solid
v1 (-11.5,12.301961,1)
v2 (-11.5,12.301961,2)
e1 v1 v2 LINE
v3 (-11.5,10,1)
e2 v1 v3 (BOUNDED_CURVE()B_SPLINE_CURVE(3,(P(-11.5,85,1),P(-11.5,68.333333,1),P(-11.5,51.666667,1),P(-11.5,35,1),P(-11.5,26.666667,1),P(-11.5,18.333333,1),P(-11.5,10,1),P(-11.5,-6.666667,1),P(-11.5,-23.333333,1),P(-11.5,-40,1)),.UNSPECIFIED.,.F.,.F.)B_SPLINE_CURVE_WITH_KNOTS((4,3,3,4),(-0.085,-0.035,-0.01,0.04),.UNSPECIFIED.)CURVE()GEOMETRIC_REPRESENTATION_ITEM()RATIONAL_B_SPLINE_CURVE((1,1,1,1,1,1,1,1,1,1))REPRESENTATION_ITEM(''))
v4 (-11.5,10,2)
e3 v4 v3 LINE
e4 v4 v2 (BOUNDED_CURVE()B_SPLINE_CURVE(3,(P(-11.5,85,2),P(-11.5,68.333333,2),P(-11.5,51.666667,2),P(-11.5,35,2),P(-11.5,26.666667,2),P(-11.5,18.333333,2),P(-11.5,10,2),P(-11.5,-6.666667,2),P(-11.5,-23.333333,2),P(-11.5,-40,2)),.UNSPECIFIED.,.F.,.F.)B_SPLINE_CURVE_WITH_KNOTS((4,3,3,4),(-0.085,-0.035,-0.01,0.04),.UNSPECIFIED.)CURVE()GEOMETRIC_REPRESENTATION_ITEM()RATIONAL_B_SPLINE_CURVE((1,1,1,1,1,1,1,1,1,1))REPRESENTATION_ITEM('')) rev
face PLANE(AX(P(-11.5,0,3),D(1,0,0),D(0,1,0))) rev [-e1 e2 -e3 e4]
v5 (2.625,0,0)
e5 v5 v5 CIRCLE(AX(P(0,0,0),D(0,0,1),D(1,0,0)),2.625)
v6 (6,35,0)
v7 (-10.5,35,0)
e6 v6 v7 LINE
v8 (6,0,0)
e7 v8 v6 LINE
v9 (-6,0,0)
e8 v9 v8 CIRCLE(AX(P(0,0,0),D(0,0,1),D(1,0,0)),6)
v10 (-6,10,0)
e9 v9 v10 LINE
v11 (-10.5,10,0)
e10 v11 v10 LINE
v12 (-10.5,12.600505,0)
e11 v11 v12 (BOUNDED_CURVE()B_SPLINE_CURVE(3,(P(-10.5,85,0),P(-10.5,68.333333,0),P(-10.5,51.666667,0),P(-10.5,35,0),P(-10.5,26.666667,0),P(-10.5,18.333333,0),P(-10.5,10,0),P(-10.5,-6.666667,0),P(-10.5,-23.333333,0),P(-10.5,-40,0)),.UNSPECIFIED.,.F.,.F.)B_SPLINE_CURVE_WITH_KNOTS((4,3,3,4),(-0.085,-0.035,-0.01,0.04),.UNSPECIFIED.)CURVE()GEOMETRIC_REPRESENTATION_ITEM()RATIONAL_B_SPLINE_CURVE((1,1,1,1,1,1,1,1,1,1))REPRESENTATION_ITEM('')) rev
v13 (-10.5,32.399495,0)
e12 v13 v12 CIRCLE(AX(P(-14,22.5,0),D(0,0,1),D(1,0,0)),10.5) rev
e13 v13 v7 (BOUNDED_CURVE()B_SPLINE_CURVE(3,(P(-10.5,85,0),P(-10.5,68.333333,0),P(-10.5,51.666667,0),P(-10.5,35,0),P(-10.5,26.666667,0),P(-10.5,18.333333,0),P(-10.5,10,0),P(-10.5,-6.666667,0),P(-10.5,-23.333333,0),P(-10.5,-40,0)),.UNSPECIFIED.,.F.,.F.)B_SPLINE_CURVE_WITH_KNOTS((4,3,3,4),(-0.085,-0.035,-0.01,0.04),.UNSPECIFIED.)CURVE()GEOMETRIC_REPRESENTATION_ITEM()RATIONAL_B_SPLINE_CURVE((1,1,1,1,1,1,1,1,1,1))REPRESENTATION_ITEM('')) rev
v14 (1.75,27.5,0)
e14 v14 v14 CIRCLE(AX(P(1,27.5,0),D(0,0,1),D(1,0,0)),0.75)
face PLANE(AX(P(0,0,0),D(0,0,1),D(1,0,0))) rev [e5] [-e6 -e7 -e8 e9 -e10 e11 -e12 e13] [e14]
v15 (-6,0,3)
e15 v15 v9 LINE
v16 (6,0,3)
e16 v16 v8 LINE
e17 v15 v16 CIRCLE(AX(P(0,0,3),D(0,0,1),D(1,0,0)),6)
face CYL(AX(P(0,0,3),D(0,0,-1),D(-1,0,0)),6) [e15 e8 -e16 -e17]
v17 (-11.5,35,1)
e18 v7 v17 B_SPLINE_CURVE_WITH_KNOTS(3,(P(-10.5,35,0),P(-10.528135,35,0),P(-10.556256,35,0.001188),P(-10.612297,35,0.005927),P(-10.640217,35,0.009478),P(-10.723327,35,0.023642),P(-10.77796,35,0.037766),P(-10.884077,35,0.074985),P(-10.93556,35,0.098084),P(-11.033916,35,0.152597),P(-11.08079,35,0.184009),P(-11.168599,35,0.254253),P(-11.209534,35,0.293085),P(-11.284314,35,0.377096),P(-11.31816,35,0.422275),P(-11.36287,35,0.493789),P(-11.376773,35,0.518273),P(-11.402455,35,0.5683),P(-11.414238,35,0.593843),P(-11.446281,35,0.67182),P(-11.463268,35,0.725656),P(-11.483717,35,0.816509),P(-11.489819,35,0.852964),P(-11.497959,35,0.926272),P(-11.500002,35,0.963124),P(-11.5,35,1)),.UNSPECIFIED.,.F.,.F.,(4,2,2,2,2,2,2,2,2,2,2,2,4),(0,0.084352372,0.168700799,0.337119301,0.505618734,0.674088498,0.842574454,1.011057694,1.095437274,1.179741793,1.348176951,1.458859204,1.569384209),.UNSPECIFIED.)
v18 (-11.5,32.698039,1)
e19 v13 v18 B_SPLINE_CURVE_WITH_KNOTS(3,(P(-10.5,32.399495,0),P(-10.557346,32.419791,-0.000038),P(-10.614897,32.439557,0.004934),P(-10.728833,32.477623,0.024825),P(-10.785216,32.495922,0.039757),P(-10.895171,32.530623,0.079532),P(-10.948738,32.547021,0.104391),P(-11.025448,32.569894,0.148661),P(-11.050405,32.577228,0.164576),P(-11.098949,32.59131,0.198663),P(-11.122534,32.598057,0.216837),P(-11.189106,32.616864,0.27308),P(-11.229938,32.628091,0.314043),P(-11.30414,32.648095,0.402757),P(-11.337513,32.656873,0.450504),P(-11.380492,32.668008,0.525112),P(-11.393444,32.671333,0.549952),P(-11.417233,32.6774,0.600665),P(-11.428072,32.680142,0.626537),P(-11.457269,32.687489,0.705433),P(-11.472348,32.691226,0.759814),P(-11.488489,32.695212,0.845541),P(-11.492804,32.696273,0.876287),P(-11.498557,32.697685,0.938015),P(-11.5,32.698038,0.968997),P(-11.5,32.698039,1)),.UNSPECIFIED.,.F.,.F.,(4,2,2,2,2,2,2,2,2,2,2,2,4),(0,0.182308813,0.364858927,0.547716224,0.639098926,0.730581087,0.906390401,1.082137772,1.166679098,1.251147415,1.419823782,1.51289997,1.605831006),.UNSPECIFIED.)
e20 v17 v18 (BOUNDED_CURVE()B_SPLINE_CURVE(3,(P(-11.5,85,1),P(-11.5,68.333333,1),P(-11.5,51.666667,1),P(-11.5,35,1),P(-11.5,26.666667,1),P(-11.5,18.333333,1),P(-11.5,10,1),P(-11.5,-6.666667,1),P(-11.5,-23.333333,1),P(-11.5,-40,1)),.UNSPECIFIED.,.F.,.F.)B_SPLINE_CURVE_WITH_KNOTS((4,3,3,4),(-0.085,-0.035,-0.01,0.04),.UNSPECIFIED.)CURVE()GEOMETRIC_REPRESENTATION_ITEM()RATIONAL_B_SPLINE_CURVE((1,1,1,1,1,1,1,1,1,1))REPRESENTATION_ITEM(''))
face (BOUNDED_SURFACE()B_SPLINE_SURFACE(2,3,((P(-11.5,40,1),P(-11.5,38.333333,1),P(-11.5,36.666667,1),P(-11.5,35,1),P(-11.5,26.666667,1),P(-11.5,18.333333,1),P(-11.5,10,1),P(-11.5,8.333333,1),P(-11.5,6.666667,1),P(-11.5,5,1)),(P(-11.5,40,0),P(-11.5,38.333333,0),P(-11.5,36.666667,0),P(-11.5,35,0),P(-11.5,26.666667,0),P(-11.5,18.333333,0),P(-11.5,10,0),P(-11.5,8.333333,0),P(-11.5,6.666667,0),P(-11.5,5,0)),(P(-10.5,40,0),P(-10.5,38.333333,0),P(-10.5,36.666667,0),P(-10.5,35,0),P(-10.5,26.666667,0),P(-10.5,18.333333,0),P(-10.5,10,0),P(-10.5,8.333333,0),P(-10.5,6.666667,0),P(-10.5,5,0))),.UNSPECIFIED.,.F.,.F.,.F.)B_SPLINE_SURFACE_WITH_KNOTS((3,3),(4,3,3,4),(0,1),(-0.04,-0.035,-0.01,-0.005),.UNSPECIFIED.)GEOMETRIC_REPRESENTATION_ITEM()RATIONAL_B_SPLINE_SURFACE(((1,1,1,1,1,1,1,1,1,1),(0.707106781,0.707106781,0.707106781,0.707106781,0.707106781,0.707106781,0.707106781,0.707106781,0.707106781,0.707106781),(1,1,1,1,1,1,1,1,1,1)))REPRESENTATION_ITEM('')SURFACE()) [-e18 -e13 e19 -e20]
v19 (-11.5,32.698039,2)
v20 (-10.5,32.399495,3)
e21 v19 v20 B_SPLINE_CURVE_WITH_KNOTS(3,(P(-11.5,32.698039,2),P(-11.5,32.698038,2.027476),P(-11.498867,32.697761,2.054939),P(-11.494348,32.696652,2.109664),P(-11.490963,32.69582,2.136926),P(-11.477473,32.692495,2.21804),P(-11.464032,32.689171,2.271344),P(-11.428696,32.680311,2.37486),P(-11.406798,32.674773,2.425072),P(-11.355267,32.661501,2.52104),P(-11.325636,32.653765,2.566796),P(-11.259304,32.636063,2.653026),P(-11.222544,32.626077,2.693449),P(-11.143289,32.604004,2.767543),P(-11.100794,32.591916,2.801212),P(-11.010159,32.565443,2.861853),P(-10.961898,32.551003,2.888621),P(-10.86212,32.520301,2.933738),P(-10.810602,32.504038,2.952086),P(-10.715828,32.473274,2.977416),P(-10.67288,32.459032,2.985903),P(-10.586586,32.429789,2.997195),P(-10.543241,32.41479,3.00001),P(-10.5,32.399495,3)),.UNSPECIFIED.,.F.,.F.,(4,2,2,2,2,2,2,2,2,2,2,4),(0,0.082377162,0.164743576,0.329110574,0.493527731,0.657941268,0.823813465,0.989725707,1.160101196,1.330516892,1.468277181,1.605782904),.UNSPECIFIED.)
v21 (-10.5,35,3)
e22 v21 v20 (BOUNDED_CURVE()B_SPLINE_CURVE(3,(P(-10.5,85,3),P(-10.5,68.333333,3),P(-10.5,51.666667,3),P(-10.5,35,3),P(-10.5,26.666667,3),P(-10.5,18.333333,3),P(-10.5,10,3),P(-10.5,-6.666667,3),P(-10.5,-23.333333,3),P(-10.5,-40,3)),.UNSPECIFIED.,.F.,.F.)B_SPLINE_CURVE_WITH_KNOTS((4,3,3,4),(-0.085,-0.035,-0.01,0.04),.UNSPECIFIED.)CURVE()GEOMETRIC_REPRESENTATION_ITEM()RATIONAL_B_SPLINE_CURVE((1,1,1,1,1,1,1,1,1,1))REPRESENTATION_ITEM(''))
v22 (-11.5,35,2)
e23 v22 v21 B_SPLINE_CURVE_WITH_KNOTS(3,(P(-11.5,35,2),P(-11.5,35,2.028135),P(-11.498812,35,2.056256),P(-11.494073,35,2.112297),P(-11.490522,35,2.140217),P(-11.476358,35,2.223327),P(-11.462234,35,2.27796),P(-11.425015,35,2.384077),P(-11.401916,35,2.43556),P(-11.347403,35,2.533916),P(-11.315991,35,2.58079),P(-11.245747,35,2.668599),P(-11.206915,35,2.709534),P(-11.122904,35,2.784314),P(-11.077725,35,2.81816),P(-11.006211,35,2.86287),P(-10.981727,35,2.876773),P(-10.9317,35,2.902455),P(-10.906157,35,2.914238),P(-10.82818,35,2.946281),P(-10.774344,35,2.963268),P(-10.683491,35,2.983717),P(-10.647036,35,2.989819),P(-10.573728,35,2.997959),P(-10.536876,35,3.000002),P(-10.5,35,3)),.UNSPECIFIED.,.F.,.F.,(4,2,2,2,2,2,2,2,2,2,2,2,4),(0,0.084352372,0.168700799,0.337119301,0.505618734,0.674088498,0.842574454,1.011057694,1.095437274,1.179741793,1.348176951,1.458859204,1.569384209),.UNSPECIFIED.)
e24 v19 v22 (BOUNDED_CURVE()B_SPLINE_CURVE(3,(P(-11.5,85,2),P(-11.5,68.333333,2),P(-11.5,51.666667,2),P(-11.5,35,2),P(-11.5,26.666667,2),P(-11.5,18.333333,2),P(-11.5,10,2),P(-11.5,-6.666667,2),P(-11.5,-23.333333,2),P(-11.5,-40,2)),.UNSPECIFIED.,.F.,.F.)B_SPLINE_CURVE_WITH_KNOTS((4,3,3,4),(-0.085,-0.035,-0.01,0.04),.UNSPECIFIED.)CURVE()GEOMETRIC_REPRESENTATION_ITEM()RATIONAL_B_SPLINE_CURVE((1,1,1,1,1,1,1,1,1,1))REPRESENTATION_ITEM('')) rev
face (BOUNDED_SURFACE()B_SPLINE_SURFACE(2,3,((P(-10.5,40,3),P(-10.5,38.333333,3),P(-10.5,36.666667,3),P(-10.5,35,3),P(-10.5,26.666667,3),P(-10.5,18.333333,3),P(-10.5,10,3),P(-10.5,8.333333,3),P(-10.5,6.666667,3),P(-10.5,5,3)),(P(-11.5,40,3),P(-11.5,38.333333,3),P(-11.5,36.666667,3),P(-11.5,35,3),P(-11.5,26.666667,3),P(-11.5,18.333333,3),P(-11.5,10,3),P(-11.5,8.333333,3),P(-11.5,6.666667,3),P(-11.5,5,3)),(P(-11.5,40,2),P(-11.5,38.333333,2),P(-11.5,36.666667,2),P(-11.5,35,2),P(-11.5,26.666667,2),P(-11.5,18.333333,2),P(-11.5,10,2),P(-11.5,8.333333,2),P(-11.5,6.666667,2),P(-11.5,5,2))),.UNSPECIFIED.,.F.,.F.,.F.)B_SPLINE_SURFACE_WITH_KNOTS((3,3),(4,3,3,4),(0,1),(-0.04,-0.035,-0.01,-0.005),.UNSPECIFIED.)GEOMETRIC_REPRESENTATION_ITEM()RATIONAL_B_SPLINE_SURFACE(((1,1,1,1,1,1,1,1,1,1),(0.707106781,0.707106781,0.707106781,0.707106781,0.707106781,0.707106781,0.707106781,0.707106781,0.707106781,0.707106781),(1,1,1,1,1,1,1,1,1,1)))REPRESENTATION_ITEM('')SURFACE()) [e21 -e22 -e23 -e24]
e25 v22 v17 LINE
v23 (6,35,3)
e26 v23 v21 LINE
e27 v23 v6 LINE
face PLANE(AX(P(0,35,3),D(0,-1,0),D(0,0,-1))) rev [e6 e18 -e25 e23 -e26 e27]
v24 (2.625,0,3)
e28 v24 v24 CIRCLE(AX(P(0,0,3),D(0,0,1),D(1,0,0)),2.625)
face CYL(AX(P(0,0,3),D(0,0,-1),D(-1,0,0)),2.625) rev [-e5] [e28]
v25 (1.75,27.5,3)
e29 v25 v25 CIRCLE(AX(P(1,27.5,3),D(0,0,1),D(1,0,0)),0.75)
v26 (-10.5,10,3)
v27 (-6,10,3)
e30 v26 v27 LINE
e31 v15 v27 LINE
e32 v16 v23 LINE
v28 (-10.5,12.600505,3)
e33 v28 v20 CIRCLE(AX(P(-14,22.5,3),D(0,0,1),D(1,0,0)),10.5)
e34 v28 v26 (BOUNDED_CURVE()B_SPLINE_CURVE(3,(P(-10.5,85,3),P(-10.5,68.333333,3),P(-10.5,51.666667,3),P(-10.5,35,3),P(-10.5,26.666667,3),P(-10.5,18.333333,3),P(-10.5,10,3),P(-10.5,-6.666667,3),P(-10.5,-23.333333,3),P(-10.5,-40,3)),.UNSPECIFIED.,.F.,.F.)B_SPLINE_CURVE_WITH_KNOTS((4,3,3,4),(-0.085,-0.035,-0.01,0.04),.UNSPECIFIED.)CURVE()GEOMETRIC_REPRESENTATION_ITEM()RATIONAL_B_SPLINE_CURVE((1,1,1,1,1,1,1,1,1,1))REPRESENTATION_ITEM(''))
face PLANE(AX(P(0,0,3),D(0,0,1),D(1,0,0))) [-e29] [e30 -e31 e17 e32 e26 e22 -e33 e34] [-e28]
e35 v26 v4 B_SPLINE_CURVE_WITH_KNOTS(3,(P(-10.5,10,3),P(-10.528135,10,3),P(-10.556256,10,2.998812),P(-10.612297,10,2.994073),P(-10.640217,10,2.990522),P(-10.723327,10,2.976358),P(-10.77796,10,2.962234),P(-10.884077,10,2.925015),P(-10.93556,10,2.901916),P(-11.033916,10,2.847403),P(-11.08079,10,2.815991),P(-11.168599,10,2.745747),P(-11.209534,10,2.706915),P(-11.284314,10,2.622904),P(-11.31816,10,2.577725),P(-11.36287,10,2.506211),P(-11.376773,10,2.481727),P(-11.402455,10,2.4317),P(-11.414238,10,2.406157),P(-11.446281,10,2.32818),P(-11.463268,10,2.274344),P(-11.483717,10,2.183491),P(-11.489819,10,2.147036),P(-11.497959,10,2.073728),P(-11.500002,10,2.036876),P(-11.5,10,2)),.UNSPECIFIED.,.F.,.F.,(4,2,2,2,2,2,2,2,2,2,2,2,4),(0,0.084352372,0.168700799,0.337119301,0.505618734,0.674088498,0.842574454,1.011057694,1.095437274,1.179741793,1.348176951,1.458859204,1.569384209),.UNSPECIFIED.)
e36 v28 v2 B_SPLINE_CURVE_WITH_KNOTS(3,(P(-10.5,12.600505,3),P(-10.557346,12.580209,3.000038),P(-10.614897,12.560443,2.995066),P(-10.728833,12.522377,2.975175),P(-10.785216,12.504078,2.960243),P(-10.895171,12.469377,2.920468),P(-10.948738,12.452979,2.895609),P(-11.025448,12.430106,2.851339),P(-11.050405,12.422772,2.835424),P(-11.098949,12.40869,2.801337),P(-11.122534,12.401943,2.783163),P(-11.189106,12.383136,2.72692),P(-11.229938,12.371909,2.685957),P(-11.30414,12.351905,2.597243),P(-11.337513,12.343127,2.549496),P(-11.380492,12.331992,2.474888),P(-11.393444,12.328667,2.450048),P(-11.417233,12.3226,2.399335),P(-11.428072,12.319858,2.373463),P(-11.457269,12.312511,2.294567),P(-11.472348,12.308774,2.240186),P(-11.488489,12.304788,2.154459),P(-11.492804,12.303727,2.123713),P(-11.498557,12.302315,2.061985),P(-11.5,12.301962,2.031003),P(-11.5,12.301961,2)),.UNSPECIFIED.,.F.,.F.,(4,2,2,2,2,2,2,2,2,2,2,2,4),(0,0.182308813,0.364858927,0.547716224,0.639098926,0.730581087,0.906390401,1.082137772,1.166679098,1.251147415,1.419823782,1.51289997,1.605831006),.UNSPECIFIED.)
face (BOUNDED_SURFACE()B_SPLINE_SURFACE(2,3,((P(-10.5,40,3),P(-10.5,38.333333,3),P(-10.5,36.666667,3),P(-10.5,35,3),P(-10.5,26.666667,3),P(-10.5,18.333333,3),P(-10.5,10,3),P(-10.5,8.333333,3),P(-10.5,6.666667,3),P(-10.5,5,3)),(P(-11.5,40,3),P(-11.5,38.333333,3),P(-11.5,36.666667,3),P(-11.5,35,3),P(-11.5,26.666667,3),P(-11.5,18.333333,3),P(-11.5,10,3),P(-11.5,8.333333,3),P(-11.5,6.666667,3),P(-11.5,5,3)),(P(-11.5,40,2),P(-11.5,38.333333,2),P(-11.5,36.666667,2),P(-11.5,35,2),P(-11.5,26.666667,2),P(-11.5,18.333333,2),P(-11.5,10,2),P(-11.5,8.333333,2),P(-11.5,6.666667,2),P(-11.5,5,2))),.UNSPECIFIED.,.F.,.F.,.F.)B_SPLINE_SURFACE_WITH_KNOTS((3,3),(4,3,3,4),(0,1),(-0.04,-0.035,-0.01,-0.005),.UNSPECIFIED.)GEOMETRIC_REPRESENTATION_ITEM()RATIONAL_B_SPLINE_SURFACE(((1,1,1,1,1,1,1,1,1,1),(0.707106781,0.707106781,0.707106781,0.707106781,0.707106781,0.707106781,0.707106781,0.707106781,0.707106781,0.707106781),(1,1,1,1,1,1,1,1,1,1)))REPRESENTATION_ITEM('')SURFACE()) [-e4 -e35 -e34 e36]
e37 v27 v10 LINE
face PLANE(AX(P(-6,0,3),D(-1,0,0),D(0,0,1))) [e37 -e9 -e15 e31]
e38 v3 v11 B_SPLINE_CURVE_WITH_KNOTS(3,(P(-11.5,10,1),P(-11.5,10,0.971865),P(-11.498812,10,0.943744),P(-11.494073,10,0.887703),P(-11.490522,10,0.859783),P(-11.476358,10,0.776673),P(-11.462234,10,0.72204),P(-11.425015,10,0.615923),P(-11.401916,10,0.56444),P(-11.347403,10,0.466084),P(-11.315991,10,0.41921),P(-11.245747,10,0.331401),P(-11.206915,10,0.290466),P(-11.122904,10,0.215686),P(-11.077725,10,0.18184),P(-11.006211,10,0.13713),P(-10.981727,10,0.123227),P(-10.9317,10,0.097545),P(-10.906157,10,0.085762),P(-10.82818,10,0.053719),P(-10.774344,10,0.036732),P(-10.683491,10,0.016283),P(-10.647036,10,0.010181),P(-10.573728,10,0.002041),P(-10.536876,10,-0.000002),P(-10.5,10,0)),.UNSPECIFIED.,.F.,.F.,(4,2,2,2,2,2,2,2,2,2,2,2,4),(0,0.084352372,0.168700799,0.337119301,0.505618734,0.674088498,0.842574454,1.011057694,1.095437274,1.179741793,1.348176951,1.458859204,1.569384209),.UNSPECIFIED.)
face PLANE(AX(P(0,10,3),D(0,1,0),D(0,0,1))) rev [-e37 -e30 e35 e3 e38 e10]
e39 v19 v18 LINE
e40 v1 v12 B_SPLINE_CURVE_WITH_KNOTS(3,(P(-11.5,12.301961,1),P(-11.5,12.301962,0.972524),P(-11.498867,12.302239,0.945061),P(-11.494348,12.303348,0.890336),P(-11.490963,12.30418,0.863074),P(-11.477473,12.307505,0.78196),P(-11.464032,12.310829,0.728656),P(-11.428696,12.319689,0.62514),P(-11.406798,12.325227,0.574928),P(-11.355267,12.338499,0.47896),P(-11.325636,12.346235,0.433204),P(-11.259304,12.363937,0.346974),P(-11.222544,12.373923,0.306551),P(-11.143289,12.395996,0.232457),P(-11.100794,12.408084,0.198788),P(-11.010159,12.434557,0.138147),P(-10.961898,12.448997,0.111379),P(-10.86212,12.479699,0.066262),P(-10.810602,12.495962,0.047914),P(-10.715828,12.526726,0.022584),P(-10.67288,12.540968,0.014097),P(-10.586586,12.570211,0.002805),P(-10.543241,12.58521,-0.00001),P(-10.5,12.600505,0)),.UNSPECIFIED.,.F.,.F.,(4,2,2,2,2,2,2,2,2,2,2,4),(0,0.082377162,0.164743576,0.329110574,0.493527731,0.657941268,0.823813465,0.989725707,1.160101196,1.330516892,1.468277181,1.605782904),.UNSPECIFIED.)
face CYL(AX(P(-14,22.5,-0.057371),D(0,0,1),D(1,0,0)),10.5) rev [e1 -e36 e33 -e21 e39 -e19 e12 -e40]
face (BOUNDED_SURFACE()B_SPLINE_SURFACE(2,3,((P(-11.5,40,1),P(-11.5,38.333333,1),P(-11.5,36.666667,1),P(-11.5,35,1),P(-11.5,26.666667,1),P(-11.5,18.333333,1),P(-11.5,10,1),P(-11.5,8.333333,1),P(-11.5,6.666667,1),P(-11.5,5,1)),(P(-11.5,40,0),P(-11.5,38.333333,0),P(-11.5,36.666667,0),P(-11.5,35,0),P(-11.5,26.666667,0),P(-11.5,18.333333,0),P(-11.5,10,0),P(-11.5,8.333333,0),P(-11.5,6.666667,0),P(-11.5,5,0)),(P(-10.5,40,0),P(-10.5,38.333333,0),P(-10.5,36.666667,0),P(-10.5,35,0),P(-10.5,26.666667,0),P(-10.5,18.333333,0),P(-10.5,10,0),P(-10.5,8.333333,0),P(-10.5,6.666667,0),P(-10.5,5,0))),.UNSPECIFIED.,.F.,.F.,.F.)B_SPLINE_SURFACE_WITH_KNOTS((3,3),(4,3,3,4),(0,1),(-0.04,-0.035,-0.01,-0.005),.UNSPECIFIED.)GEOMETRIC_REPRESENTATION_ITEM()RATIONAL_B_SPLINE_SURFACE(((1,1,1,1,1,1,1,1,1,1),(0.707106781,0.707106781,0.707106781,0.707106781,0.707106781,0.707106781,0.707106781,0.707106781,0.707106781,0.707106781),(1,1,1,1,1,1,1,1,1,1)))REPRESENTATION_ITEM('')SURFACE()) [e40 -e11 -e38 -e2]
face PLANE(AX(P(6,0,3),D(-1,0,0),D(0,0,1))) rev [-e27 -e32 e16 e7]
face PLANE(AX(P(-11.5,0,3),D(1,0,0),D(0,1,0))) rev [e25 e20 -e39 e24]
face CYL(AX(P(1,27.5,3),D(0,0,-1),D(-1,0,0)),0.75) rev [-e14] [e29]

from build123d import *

# Parameters (mm, degrees)
SKETCH1_R           = 0.75
SKETCH1_R_2         = 2.625
BOSS_EXTRUDE1_DEPTH = 3
VARFILLET1_R        = 1
CUT_EXTRUDE1_REACH  = 38.963
SKETCH2_R           = 10.5


with BuildPart() as part:
    # Sketch1 → Boss-Extrude1 (new body)
    with BuildSketch(Plane.XY):
        with BuildLine():
            Line((-6, 10), (-6, 0))
            ThreePointArc((-6, 0), (0, -6), (6, 0))
            Line((6, 0), (6, 35))
            Line((6, 35), (-11.5, 35))
            Line((-11.5, 35), (-11.5, 10))
            Line((-11.5, 10), (-6, 10))
        make_face()
        with Locations((1, 27.5)):
            Circle(SKETCH1_R, mode=Mode.SUBTRACT)
        Circle(SKETCH1_R_2, mode=Mode.SUBTRACT)
    extrude(amount=BOSS_EXTRUDE1_DEPTH)

    # VarFillet1
    varfillet1_edges = [part.edges().sort_by_distance(p)[0] for p in [
        (-11.5, 22.5, 0),
        (-11.5, 22.5, 3),
    ]]
    fillet(varfillet1_edges, radius=VARFILLET1_R)

    # Sketch2 → Cut-Extrude1 (cut, up to next)
    with BuildSketch(Plane.XY.offset(3), mode=Mode.PRIVATE) as cut_extrude1_sk1:
        with Locations((-14, 22.5)):
            Circle(SKETCH2_R)
    cut_extrude1_tool1 = extrude(cut_extrude1_sk1.sketch, amount=-CUT_EXTRUDE1_REACH, mode=Mode.PRIVATE) & part.part
    add(cut_extrude1_tool1.solids().sort_by_distance((-14, 22.5, 3))[0], mode=Mode.SUBTRACT)


solid = part.part
